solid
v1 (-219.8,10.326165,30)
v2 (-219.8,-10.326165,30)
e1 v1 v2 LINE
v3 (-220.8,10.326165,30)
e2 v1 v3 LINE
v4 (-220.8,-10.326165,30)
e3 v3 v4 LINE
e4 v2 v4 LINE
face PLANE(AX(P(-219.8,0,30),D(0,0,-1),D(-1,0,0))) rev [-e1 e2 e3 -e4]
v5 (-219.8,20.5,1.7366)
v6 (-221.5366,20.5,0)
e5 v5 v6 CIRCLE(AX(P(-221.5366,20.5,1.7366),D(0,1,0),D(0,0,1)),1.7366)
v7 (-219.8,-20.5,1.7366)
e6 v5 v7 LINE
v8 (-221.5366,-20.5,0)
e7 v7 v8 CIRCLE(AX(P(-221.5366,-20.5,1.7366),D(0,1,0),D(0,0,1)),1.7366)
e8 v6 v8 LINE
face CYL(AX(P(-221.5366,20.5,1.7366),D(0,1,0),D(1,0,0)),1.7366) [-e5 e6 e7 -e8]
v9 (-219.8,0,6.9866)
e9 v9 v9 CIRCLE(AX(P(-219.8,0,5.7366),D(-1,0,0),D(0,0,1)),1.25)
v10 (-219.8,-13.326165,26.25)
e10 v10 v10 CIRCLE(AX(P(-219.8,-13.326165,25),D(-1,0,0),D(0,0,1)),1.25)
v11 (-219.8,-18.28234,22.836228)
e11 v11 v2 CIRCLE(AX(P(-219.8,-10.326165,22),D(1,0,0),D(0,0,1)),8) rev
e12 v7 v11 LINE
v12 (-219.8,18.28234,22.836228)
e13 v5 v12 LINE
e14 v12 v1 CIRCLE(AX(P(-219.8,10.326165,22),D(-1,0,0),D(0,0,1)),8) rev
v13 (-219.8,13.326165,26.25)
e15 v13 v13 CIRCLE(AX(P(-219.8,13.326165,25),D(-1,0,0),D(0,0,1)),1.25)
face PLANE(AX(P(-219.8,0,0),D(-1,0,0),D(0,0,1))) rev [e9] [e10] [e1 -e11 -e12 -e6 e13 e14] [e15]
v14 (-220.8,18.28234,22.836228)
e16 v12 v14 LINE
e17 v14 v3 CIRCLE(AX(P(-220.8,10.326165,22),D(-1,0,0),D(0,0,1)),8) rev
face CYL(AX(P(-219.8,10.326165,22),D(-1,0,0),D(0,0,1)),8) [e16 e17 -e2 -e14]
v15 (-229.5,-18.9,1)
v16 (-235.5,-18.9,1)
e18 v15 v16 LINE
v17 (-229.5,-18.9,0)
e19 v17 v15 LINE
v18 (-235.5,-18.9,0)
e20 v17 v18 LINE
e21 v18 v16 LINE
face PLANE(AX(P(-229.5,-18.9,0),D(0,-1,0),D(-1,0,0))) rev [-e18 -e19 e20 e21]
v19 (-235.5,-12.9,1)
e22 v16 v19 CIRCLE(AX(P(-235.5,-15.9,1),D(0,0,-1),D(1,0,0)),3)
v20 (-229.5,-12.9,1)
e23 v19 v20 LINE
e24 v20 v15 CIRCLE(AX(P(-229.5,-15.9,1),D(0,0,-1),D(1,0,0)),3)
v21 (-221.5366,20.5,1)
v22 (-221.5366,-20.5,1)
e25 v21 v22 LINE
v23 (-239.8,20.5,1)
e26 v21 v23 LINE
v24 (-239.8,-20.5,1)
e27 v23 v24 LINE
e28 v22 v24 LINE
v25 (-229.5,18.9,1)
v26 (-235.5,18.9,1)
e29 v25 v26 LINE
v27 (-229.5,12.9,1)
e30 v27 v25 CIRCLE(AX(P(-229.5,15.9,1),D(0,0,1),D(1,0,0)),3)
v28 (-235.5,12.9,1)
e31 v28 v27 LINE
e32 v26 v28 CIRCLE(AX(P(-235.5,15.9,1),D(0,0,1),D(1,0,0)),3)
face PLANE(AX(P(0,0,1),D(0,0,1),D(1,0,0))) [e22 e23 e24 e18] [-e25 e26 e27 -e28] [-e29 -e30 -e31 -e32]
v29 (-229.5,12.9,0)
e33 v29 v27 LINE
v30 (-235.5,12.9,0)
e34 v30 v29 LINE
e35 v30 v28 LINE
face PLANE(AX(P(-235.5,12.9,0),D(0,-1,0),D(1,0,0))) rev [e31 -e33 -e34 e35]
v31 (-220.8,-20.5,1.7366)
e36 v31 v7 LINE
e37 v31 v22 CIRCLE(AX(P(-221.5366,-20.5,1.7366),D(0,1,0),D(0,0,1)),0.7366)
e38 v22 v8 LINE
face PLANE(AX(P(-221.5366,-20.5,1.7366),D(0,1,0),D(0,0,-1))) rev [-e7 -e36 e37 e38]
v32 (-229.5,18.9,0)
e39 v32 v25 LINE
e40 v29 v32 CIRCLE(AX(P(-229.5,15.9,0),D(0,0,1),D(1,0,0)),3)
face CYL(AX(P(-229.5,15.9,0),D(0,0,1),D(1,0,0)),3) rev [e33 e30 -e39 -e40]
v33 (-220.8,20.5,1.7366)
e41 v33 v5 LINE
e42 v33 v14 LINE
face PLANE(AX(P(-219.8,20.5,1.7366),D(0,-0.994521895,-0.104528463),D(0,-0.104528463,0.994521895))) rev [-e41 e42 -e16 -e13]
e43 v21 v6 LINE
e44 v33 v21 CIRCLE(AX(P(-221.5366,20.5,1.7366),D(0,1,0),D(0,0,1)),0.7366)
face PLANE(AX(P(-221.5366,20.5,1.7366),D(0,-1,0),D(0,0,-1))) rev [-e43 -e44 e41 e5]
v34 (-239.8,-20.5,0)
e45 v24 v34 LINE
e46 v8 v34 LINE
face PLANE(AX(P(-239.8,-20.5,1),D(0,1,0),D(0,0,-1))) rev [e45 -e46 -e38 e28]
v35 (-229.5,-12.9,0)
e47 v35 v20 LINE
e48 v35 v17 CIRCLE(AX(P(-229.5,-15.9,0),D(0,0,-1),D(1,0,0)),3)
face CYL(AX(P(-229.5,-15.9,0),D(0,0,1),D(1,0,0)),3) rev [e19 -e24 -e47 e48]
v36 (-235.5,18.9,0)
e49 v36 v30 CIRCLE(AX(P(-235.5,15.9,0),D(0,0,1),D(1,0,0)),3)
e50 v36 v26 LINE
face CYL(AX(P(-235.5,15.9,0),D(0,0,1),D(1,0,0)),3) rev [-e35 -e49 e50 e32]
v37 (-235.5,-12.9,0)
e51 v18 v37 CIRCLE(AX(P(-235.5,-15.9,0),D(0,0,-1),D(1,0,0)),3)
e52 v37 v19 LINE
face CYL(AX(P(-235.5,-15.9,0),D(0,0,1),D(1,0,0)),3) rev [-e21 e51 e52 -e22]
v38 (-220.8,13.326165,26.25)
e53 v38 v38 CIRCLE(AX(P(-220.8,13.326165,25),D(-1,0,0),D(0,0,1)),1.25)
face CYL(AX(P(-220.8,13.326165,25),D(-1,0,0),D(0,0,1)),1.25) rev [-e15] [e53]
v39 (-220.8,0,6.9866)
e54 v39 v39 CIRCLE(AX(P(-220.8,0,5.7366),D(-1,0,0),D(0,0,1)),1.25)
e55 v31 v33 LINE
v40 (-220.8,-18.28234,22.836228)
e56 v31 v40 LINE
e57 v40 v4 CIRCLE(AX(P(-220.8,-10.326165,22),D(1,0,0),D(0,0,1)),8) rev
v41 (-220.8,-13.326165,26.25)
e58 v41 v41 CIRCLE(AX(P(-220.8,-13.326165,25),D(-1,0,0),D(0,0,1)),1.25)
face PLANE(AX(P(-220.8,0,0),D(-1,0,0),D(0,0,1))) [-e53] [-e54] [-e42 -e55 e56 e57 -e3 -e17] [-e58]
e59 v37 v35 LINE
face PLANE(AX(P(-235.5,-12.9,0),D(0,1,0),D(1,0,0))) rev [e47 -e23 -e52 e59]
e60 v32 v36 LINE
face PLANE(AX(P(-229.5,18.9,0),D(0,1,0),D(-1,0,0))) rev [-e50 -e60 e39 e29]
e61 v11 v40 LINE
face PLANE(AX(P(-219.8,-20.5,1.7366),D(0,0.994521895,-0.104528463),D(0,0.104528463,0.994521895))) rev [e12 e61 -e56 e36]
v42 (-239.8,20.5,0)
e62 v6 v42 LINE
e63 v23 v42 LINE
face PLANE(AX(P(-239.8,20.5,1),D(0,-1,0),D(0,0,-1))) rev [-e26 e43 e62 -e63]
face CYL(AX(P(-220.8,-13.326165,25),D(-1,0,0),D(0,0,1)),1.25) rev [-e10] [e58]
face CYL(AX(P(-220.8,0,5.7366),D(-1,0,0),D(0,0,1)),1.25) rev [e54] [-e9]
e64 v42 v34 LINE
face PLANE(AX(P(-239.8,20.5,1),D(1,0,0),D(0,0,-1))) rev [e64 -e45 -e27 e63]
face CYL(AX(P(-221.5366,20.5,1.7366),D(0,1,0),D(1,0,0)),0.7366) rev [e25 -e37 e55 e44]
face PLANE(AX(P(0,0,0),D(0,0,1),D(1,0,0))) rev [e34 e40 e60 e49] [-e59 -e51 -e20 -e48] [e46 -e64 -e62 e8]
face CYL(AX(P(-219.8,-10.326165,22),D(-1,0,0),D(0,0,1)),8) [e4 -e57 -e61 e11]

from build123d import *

# Parameters (mm, degrees)
SKETCH1_W                    = 20
SKETCH1_H                    = 20.5
BASE_FLANGE1_DEPTH           = 1
EDGE_FLANGE1_STRIP_W         = 5.4732
EDGE_FLANGE1_STRIP_H         = 1
EDGE_FLANGE1_STRIP_CUT_DEPTH = 20.5
EDGE_FLANGE1_DEPTH           = 20.5
CUT_EXTRUDE1_DEPTH           = 42.003048667
CUT_EXTRUDE1_DEPTH_BACK      = 10
CUT_EXTRUDE2_DEPTH           = 1
M3_TAPPED_HOLE1_D            = 2.5


# Sheet-metal steps are written as plain solids
with BuildPart() as part:
    # Sketch1 → Base-Flange1 (new body)
    with BuildSketch(Plane.XY):
        with Locations((-229.8, 10.25)):
            Rectangle(SKETCH1_W, SKETCH1_H)
    extrude(amount=BASE_FLANGE1_DEPTH)

    # Edge-Flange1 strip (across the edge) → Edge-Flange1 strip cut (cut)
    with BuildSketch(Plane(origin=(-219.8, 0, 1), x_dir=(-1, 0, 0), z_dir=(0, 1, 0))):
        with Locations((-1, -0.5)):
            Rectangle(EDGE_FLANGE1_STRIP_W, EDGE_FLANGE1_STRIP_H)
    extrude(amount=EDGE_FLANGE1_STRIP_CUT_DEPTH, mode=Mode.SUBTRACT)

    # Edge-Flange1 section (across the edge) → Edge-Flange1 (add)
    with BuildSketch(Plane(origin=(-219.8, 0, 1), x_dir=(-1, 0, 0), z_dir=(0, 1, 0))):
        with BuildLine():
            Line((0, 0.7366), (0, 29))
            Line((0, 29), (1, 29))
            Line((1, 29), (1, 0.7366))
            ThreePointArc((1, 0.7366), (1.215745145, 0.215745145), (1.7366, 0))
            Line((1.7366, 0), (1.7366, -1))
            ThreePointArc((1.7366, -1), (0.508638364, -0.491361636), (0, 0.7366))
        make_face()
    extrude(amount=EDGE_FLANGE1_DEPTH)

    # Sketch9 → Cut-Extrude1 (cut, two sides: drawn at the far end of the back side and taken through both)
    with BuildSketch(Plane.ZY.offset(220.8).offset(-CUT_EXTRUDE1_DEPTH_BACK)):
        with BuildLine():
            Line((-80.481011606, 29.141419193), (1.7366, 20.5))
            Line((1.7366, 20.5), (22.836227706, 18.282339766))
            ThreePointArc((22.836227706, 18.282339766), (27.945158604, 15.679209453), (30, 10.326164603))
            Line((30, 10.326164603), (30, 0))
            Line((30, 0), (30, -82.670489196))
            Line((30, -82.670489196), (147.611596884, 33.541177232))
            Line((147.611596884, 33.541177232), (37.130585278, 145.353085621))
            Line((37.130585278, 145.353085621), (-80.481011606, 29.141419193))
        make_face()
    extrude(amount=CUT_EXTRUDE1_DEPTH + CUT_EXTRUDE1_DEPTH_BACK, mode=Mode.SUBTRACT)

    # Sketch11 → Cut-Extrude2 (cut)
    with BuildSketch(Plane.XY.offset(1)):
        with BuildLine():
            Line((-229.5, 18.9), (-235.5, 18.9))
            ThreePointArc((-235.5, 18.9), (-238.5, 15.9), (-235.5, 12.9))
            Line((-235.5, 12.9), (-229.5, 12.9))
            ThreePointArc((-229.5, 12.9), (-226.5, 15.9), (-229.5, 18.9))
        make_face()
    extrude(amount=-CUT_EXTRUDE2_DEPTH, mode=Mode.SUBTRACT)

    # Mirror1: part across plane


with BuildPart() as part_1:
    add(part.part)
    add(part.part.mirror(Plane(origin=(-239.8, 0, 1), x_dir=(0, 0, 1), z_dir=(0, 1, 0))))

    # M3 Tapped Hole1 (through all)
    with Locations(Plane.ZY.offset(220.8)):
        with Locations((5.7366, 0), (25, 13.326164603), (25, -13.326164603)):
            Hole(M3_TAPPED_HOLE1_D / 2)


solid = part_1.part
